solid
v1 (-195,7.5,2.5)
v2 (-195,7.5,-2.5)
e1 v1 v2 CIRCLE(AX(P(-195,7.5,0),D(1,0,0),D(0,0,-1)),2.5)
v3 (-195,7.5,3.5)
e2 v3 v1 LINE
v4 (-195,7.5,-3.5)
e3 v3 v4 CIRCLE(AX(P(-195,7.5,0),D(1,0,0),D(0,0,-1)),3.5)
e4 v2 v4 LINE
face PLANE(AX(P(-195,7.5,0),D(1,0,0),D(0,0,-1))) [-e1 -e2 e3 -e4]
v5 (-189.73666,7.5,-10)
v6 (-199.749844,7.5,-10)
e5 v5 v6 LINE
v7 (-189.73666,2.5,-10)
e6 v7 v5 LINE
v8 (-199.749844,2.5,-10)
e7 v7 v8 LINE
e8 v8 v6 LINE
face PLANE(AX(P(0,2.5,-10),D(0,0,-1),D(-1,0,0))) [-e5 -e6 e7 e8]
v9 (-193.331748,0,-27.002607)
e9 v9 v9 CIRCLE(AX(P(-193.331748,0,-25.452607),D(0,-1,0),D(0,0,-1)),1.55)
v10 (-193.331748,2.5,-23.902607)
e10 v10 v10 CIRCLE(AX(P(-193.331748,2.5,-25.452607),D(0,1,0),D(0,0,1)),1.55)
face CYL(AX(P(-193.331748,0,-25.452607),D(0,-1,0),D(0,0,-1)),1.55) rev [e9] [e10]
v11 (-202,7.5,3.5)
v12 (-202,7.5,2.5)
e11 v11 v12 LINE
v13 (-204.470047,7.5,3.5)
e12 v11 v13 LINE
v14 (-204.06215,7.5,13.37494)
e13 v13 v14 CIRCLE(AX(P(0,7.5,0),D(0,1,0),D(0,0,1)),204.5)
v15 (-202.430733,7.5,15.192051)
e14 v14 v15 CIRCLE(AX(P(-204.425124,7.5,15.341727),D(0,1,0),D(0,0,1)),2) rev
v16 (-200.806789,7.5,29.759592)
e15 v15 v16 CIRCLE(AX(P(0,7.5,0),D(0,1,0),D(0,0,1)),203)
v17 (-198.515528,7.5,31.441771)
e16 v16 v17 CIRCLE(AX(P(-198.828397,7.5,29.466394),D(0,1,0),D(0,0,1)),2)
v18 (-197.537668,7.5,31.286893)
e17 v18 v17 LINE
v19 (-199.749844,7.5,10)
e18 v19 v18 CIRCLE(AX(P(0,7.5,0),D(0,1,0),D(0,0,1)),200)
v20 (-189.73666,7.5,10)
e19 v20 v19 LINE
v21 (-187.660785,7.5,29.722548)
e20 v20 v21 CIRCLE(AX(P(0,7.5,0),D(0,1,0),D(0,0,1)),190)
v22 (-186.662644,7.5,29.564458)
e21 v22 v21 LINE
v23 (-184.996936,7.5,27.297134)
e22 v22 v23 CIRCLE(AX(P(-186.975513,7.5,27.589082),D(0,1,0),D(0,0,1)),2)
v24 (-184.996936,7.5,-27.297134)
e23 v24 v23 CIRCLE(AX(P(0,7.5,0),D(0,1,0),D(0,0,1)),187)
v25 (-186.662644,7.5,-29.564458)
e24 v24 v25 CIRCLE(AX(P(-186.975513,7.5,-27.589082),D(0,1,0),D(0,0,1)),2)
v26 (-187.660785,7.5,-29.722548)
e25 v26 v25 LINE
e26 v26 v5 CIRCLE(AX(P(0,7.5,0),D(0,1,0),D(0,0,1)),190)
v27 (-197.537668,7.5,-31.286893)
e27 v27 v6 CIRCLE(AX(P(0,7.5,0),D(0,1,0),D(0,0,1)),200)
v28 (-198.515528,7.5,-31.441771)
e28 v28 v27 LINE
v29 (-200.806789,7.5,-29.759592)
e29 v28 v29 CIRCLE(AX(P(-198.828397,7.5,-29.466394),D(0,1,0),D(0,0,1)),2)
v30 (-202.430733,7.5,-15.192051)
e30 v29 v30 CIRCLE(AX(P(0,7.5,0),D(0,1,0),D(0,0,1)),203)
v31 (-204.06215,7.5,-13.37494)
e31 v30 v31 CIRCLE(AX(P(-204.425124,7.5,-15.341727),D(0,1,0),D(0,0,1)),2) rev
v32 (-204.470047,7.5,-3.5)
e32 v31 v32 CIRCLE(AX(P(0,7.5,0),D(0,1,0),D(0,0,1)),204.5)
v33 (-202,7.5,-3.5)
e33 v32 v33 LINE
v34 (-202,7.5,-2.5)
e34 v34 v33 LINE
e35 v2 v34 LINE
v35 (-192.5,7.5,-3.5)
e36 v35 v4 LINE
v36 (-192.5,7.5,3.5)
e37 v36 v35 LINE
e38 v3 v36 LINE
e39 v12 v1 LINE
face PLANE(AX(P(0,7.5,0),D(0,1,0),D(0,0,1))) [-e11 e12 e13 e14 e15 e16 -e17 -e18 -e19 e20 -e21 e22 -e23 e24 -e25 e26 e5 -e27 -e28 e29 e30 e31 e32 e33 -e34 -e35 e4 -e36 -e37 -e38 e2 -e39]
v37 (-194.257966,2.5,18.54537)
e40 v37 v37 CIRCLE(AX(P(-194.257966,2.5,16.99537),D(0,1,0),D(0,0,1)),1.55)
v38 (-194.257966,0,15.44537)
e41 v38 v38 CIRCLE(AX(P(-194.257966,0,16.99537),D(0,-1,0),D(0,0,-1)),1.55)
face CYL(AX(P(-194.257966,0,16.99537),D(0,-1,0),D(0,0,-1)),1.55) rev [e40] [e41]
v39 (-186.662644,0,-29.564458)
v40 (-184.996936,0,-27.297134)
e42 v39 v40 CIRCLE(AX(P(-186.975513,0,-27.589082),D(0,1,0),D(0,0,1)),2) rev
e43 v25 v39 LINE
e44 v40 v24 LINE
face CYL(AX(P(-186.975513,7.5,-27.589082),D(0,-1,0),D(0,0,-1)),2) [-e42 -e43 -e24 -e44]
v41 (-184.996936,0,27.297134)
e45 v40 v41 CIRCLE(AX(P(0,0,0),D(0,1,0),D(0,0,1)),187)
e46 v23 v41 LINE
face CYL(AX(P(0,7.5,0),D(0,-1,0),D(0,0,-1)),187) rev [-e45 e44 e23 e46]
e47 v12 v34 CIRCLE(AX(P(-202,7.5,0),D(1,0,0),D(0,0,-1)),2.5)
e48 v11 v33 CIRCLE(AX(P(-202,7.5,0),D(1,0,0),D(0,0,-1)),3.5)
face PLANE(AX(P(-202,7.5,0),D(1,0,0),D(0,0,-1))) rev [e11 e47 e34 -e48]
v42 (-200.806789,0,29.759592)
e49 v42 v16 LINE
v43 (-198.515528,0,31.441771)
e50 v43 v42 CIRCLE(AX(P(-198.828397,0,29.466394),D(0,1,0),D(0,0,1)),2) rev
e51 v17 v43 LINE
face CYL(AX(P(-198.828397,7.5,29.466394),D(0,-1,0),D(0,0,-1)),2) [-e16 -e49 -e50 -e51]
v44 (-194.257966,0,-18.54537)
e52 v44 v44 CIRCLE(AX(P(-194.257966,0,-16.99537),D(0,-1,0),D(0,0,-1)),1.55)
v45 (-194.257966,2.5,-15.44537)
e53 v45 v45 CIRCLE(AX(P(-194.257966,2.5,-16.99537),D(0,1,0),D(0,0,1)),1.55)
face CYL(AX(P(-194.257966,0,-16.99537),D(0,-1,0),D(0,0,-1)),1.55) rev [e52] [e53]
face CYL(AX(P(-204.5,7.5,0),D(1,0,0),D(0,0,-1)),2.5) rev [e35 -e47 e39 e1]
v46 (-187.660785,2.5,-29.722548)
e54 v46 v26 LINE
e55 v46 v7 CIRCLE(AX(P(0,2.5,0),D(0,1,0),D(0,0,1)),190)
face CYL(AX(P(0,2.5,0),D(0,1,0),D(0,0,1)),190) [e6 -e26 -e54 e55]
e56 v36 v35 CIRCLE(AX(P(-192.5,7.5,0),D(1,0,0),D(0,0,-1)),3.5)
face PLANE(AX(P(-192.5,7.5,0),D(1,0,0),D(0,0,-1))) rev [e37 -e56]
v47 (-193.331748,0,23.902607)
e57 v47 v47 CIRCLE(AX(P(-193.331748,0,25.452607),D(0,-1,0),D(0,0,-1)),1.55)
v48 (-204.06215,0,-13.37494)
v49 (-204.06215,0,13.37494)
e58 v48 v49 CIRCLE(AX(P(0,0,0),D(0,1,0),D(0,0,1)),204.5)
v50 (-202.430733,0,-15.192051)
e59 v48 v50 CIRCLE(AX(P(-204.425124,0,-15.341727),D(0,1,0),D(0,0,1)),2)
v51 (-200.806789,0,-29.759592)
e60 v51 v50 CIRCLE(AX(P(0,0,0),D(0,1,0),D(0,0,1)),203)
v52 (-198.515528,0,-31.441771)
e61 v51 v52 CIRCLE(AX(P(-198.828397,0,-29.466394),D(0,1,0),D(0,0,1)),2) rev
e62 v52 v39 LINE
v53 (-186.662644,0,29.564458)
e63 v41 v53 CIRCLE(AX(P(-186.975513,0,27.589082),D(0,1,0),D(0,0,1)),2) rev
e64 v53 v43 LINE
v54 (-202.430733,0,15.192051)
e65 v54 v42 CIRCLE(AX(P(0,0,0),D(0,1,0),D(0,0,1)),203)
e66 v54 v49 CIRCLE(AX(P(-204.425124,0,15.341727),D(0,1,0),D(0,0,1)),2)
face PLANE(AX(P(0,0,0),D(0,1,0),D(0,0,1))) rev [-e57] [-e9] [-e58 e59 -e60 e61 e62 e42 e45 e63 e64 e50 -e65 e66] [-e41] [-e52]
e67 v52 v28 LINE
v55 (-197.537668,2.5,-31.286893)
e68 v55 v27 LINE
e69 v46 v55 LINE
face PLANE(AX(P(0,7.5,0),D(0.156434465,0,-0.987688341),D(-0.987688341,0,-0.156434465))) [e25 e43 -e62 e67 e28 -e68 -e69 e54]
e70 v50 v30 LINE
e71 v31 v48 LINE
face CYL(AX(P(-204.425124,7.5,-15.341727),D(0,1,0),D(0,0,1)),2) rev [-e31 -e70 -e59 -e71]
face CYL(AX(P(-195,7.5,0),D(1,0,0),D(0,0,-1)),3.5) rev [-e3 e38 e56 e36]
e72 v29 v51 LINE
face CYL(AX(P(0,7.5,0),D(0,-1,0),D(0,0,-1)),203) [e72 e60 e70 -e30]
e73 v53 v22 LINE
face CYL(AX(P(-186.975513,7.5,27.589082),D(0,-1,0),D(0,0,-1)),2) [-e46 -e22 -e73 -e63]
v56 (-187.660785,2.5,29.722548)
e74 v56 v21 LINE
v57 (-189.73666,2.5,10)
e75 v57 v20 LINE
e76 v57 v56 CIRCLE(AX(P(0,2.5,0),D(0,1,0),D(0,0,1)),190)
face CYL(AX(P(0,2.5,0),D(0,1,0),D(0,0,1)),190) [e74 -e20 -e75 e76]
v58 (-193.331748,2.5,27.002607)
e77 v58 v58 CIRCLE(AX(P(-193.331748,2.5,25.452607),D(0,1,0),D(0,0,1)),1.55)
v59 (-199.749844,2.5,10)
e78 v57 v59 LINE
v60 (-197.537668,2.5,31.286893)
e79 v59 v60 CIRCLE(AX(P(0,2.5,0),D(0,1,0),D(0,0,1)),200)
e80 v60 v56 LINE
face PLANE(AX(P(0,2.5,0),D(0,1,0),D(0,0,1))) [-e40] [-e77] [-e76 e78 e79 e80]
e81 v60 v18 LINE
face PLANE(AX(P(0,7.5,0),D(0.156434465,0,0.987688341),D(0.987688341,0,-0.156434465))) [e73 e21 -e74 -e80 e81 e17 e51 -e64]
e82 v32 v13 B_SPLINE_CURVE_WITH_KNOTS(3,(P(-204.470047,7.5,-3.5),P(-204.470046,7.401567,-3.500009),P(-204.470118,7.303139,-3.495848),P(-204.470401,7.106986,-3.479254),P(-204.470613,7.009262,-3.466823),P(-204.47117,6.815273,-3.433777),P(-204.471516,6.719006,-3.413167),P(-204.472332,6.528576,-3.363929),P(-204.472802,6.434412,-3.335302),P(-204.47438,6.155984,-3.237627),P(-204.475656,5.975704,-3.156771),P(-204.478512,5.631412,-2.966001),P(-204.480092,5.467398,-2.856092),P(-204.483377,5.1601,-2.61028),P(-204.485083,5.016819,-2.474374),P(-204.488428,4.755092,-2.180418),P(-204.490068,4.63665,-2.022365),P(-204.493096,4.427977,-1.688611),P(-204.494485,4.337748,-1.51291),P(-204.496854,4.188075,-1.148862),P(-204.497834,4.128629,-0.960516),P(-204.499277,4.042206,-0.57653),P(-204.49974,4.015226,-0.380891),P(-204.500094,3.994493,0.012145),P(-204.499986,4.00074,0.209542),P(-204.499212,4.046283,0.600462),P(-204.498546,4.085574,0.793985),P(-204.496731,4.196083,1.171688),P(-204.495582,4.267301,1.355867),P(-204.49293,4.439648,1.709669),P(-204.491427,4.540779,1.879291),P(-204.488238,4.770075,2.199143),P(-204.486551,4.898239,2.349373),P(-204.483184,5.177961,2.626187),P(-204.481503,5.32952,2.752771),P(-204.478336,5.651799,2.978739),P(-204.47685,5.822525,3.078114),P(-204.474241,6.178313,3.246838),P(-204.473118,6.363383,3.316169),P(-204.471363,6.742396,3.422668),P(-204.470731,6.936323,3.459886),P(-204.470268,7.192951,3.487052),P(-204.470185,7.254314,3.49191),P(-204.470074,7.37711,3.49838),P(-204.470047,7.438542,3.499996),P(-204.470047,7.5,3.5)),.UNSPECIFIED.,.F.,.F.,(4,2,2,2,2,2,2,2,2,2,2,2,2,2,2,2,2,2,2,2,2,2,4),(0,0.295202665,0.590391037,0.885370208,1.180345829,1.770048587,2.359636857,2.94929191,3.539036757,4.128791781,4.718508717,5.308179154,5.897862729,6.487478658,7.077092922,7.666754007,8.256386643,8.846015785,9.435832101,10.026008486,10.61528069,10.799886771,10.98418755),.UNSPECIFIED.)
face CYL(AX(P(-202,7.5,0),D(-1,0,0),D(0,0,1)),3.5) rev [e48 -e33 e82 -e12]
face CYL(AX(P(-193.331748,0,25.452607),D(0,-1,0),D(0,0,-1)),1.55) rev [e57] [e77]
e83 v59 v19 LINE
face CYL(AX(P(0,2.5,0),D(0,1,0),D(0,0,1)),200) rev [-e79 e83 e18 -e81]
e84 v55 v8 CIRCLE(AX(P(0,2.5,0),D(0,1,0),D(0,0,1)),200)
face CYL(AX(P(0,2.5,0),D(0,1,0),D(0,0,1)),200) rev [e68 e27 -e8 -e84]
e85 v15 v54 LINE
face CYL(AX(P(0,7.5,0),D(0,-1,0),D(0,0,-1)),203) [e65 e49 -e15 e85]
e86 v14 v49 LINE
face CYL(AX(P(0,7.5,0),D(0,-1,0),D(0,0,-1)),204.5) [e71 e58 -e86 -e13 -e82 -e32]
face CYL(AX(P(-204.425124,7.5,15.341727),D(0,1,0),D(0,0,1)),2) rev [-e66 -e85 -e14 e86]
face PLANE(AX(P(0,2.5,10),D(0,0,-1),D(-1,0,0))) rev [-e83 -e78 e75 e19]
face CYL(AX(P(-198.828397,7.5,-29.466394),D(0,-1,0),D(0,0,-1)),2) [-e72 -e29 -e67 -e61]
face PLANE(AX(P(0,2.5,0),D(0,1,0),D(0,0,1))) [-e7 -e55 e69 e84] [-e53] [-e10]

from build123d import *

# Parameters (mm, degrees)
BOSS_EXTRUDE1_DEPTH        = 7.5
BOSS_EXTRUDE2_DEPTH        = 7.5
CUT_EXTRUDE1_DEPTH         = 5
F_3_1_3_1_DIAMETER_HOLE2_D = 3.1
SKETCH21_R                 = 3.5
CUT_EXTRUDE2_DEPTH         = 2.5
CUT_EXTRUDE3_START         = 2.5
SKETCH23_R                 = 3.5
CUT_EXTRUDE3_DEPTH         = 2.5
SKETCH22_R                 = 2.5
CUT_EXTRUDE4_DEPTH         = 35.217583069
FILLET1_R                  = 2
FILLET2_R                  = 2


with BuildPart() as part:
    # Sketch1 → Boss-Extrude1 (new body)
    with BuildSketch(Plane(origin=(0, 0, 0), x_dir=(1, 0, 0), z_dir=(0, 1, 0))):
        with BuildLine():
            ThreePointArc((-187.660784713, 29.722548358), (-190, 0), (-187.660784713, -29.722548358))
            Line((-187.660784713, -29.722548358), (-197.537668119, -31.286893008))
            ThreePointArc((-197.537668119, -31.286893008), (-200, 0), (-197.537668119, 31.286893008))
            Line((-197.537668119, 31.286893008), (-187.660784713, 29.722548358))
        make_face()
        with BuildLine():
            ThreePointArc((-197.537668119, -31.286893008), (-200, 0), (-197.537668119, 31.286893008))
            Line((-197.537668119, 31.286893008), (-200.500733141, 31.756196403))
            ThreePointArc((-200.500733141, 31.756196403), (-203, 0), (-200.500733141, -31.756196403))
            Line((-200.500733141, -31.756196403), (-197.537668119, -31.286893008))
        make_face()
        with BuildLine():
            Line((-184.697719691, 29.253244963), (-187.660784713, 29.722548358))
            ThreePointArc((-187.660784713, 29.722548358), (-190, 0), (-187.660784713, -29.722548358))
            Line((-187.660784713, -29.722548358), (-184.697719691, -29.253244963))
            ThreePointArc((-184.697719691, -29.253244963), (-187, 0), (-184.697719691, 29.253244963))
        make_face()
    extrude(amount=BOSS_EXTRUDE1_DEPTH)

    # Sketch19 → Boss-Extrude2 (add)
    with BuildSketch(Plane(origin=(0, 0, 0), x_dir=(1, 0, 0), z_dir=(0, 1, 0))):
        with BuildLine():
            Line((-204.062149802, 13.374939928), (-202.565361417, 13.276835234))
            ThreePointArc((-202.565361417, 13.276835234), (-203, 0), (-202.565361417, -13.276835234))
            Line((-202.565361417, -13.276835234), (-204.062149802, -13.374939928))
            ThreePointArc((-204.062149802, -13.374939928), (-204.5, 0), (-204.062149802, 13.374939928))
        make_face()
    extrude(amount=BOSS_EXTRUDE2_DEPTH)

    # Sketch15 → Cut-Extrude1 (cut)
    with BuildSketch(Plane(origin=(0, 7.5, 0), x_dir=(1, 0, 0), z_dir=(0, 1, 0))):
        with BuildLine():
            Line((-199.749843554, 10), (-189.73665961, 10))
            ThreePointArc((-189.73665961, 10), (-188.956218405, 19.88837666), (-187.660784713, 29.722548358))
            Line((-187.660784713, 29.722548358), (-197.537668119, 31.286893008))
            ThreePointArc((-197.537668119, 31.286893008), (-198.928692466, 20.673057674), (-199.749843554, 10))
        make_face()
        with BuildLine():
            ThreePointArc((-187.660784713, -29.722548358), (-188.956218405, -19.88837666), (-189.73665961, -10))
            Line((-189.73665961, -10), (-199.749843554, -10))
            ThreePointArc((-199.749843554, -10), (-198.928692466, -20.673057674), (-197.537668119, -31.286893008))
            Line((-197.537668119, -31.286893008), (-187.660784713, -29.722548358))
        make_face()
    extrude(amount=-CUT_EXTRUDE1_DEPTH, mode=Mode.SUBTRACT)

    # Ø3.1 (3.1) Diameter Hole2 (through all)
    with Locations(Plane(origin=(0, 0, 0), x_dir=(-1, 0, 0), z_dir=(0, -1, 0))):
        with Locations((193.331747968, -25.452607483), (194.257966128, -16.995369836), (194.257966128, 16.995369836), (193.331747968, 25.452607483)):
            Hole(F_3_1_3_1_DIAMETER_HOLE2_D / 2)

    # Sketch21 → Cut-Extrude2 (cut)
    with BuildSketch(Plane(origin=(-192.5, 0, 0), x_dir=(0, 0, -1), z_dir=(1, 0, 0))):
        with Locations((0, 7.5)):
            Circle(SKETCH21_R)
    extrude(amount=-CUT_EXTRUDE2_DEPTH, mode=Mode.SUBTRACT)

    # Sketch23 → Cut-Extrude3 (cut)
    with BuildSketch(Plane(origin=(-204.5, 0, 0), x_dir=(0, 0, -1), z_dir=(1, 0, 0)).offset(CUT_EXTRUDE3_START)):
        with Locations((0, 7.5)):
            Circle(SKETCH23_R)
    extrude(amount=-CUT_EXTRUDE3_DEPTH, mode=Mode.SUBTRACT)

    # Sketch22 → Cut-Extrude4 (cut, through all)
    with BuildSketch(Plane(origin=(-195, 0, 0), x_dir=(0, 0, -1), z_dir=(1, 0, 0))):
        with Locations((0, 7.5)):
            Circle(SKETCH22_R)
    extrude(amount=-CUT_EXTRUDE4_DEPTH, mode=Mode.SUBTRACT)

    # Fillet1
    fillet1_edges = [part.edges().sort_by_distance(p)[0] for p in [
        (-200.500733141, 3.75, 31.756196403),
        (-200.500733141, 3.75, -31.756196403),
        (-184.697719691, 3.75, -29.253244963),
        (-184.697719691, 3.75, 29.253244963),
    ]]
    fillet(fillet1_edges, radius=FILLET1_R)

    # Fillet2
    # the kernel refuses this fillet: 2 mm, written as the material it adds along each edge
    with BuildSketch(Plane(origin=(-202.565361417, 0, -13.276835234), x_dir=(0.0701211938680431, 0, -0.9975384795437819), z_dir=(0, 1, 0))) as fillet2_piece_1:
        with BuildLine():
            CenterArc((1.929399735, 1.999977637), FILLET2_R, 194.477346772, 75.251705008)
            Line((-0.007093381, 1.499983228), (-0.045823244, 1.48998334))
            ThreePointArc((-0.045823244, 1.48998334), (-0.043546243, 0.749802457), (-0.039999553, -0.000189157))
            Line((-0.039999553, -0.000189157), (0.000189157, -0.039999553))
            ThreePointArc((0.000189157, -0.039999553), (0.959970947, -0.037730174), (1.919752737, -0.039999553))
            Line((1.919752737, -0.039999553), (1.919941893, 0))
        make_face()
    extrude(amount=7.5)
    with BuildSketch(Plane(origin=(-202.565361417, 0, 13.276835234), x_dir=(-0.9978589232386035, 0, 0.06540312923014294), z_dir=(0, 1, 0))) as fillet2_piece_2:
        with BuildLine():
            CenterArc((1.990831296, 1.938835898), FILLET2_R, 180.54189644, 75.251705008)
            Line((-0.009079253, 1.919920426), (-0.049077464, 1.919542116))
            ThreePointArc((-0.049077464, 1.919542116), (-0.042269379, 0.95978179), (-0.04, 0))
            Line((-0.04, 0), (0, -0.04))
            ThreePointArc((0, -0.04), (0.75, -0.04), (1.490183374, -0.038776718))
            Line((1.490183374, -0.038776718), (1.5, 0))
        make_face()
    extrude(amount=7.5)


solid = part.part
